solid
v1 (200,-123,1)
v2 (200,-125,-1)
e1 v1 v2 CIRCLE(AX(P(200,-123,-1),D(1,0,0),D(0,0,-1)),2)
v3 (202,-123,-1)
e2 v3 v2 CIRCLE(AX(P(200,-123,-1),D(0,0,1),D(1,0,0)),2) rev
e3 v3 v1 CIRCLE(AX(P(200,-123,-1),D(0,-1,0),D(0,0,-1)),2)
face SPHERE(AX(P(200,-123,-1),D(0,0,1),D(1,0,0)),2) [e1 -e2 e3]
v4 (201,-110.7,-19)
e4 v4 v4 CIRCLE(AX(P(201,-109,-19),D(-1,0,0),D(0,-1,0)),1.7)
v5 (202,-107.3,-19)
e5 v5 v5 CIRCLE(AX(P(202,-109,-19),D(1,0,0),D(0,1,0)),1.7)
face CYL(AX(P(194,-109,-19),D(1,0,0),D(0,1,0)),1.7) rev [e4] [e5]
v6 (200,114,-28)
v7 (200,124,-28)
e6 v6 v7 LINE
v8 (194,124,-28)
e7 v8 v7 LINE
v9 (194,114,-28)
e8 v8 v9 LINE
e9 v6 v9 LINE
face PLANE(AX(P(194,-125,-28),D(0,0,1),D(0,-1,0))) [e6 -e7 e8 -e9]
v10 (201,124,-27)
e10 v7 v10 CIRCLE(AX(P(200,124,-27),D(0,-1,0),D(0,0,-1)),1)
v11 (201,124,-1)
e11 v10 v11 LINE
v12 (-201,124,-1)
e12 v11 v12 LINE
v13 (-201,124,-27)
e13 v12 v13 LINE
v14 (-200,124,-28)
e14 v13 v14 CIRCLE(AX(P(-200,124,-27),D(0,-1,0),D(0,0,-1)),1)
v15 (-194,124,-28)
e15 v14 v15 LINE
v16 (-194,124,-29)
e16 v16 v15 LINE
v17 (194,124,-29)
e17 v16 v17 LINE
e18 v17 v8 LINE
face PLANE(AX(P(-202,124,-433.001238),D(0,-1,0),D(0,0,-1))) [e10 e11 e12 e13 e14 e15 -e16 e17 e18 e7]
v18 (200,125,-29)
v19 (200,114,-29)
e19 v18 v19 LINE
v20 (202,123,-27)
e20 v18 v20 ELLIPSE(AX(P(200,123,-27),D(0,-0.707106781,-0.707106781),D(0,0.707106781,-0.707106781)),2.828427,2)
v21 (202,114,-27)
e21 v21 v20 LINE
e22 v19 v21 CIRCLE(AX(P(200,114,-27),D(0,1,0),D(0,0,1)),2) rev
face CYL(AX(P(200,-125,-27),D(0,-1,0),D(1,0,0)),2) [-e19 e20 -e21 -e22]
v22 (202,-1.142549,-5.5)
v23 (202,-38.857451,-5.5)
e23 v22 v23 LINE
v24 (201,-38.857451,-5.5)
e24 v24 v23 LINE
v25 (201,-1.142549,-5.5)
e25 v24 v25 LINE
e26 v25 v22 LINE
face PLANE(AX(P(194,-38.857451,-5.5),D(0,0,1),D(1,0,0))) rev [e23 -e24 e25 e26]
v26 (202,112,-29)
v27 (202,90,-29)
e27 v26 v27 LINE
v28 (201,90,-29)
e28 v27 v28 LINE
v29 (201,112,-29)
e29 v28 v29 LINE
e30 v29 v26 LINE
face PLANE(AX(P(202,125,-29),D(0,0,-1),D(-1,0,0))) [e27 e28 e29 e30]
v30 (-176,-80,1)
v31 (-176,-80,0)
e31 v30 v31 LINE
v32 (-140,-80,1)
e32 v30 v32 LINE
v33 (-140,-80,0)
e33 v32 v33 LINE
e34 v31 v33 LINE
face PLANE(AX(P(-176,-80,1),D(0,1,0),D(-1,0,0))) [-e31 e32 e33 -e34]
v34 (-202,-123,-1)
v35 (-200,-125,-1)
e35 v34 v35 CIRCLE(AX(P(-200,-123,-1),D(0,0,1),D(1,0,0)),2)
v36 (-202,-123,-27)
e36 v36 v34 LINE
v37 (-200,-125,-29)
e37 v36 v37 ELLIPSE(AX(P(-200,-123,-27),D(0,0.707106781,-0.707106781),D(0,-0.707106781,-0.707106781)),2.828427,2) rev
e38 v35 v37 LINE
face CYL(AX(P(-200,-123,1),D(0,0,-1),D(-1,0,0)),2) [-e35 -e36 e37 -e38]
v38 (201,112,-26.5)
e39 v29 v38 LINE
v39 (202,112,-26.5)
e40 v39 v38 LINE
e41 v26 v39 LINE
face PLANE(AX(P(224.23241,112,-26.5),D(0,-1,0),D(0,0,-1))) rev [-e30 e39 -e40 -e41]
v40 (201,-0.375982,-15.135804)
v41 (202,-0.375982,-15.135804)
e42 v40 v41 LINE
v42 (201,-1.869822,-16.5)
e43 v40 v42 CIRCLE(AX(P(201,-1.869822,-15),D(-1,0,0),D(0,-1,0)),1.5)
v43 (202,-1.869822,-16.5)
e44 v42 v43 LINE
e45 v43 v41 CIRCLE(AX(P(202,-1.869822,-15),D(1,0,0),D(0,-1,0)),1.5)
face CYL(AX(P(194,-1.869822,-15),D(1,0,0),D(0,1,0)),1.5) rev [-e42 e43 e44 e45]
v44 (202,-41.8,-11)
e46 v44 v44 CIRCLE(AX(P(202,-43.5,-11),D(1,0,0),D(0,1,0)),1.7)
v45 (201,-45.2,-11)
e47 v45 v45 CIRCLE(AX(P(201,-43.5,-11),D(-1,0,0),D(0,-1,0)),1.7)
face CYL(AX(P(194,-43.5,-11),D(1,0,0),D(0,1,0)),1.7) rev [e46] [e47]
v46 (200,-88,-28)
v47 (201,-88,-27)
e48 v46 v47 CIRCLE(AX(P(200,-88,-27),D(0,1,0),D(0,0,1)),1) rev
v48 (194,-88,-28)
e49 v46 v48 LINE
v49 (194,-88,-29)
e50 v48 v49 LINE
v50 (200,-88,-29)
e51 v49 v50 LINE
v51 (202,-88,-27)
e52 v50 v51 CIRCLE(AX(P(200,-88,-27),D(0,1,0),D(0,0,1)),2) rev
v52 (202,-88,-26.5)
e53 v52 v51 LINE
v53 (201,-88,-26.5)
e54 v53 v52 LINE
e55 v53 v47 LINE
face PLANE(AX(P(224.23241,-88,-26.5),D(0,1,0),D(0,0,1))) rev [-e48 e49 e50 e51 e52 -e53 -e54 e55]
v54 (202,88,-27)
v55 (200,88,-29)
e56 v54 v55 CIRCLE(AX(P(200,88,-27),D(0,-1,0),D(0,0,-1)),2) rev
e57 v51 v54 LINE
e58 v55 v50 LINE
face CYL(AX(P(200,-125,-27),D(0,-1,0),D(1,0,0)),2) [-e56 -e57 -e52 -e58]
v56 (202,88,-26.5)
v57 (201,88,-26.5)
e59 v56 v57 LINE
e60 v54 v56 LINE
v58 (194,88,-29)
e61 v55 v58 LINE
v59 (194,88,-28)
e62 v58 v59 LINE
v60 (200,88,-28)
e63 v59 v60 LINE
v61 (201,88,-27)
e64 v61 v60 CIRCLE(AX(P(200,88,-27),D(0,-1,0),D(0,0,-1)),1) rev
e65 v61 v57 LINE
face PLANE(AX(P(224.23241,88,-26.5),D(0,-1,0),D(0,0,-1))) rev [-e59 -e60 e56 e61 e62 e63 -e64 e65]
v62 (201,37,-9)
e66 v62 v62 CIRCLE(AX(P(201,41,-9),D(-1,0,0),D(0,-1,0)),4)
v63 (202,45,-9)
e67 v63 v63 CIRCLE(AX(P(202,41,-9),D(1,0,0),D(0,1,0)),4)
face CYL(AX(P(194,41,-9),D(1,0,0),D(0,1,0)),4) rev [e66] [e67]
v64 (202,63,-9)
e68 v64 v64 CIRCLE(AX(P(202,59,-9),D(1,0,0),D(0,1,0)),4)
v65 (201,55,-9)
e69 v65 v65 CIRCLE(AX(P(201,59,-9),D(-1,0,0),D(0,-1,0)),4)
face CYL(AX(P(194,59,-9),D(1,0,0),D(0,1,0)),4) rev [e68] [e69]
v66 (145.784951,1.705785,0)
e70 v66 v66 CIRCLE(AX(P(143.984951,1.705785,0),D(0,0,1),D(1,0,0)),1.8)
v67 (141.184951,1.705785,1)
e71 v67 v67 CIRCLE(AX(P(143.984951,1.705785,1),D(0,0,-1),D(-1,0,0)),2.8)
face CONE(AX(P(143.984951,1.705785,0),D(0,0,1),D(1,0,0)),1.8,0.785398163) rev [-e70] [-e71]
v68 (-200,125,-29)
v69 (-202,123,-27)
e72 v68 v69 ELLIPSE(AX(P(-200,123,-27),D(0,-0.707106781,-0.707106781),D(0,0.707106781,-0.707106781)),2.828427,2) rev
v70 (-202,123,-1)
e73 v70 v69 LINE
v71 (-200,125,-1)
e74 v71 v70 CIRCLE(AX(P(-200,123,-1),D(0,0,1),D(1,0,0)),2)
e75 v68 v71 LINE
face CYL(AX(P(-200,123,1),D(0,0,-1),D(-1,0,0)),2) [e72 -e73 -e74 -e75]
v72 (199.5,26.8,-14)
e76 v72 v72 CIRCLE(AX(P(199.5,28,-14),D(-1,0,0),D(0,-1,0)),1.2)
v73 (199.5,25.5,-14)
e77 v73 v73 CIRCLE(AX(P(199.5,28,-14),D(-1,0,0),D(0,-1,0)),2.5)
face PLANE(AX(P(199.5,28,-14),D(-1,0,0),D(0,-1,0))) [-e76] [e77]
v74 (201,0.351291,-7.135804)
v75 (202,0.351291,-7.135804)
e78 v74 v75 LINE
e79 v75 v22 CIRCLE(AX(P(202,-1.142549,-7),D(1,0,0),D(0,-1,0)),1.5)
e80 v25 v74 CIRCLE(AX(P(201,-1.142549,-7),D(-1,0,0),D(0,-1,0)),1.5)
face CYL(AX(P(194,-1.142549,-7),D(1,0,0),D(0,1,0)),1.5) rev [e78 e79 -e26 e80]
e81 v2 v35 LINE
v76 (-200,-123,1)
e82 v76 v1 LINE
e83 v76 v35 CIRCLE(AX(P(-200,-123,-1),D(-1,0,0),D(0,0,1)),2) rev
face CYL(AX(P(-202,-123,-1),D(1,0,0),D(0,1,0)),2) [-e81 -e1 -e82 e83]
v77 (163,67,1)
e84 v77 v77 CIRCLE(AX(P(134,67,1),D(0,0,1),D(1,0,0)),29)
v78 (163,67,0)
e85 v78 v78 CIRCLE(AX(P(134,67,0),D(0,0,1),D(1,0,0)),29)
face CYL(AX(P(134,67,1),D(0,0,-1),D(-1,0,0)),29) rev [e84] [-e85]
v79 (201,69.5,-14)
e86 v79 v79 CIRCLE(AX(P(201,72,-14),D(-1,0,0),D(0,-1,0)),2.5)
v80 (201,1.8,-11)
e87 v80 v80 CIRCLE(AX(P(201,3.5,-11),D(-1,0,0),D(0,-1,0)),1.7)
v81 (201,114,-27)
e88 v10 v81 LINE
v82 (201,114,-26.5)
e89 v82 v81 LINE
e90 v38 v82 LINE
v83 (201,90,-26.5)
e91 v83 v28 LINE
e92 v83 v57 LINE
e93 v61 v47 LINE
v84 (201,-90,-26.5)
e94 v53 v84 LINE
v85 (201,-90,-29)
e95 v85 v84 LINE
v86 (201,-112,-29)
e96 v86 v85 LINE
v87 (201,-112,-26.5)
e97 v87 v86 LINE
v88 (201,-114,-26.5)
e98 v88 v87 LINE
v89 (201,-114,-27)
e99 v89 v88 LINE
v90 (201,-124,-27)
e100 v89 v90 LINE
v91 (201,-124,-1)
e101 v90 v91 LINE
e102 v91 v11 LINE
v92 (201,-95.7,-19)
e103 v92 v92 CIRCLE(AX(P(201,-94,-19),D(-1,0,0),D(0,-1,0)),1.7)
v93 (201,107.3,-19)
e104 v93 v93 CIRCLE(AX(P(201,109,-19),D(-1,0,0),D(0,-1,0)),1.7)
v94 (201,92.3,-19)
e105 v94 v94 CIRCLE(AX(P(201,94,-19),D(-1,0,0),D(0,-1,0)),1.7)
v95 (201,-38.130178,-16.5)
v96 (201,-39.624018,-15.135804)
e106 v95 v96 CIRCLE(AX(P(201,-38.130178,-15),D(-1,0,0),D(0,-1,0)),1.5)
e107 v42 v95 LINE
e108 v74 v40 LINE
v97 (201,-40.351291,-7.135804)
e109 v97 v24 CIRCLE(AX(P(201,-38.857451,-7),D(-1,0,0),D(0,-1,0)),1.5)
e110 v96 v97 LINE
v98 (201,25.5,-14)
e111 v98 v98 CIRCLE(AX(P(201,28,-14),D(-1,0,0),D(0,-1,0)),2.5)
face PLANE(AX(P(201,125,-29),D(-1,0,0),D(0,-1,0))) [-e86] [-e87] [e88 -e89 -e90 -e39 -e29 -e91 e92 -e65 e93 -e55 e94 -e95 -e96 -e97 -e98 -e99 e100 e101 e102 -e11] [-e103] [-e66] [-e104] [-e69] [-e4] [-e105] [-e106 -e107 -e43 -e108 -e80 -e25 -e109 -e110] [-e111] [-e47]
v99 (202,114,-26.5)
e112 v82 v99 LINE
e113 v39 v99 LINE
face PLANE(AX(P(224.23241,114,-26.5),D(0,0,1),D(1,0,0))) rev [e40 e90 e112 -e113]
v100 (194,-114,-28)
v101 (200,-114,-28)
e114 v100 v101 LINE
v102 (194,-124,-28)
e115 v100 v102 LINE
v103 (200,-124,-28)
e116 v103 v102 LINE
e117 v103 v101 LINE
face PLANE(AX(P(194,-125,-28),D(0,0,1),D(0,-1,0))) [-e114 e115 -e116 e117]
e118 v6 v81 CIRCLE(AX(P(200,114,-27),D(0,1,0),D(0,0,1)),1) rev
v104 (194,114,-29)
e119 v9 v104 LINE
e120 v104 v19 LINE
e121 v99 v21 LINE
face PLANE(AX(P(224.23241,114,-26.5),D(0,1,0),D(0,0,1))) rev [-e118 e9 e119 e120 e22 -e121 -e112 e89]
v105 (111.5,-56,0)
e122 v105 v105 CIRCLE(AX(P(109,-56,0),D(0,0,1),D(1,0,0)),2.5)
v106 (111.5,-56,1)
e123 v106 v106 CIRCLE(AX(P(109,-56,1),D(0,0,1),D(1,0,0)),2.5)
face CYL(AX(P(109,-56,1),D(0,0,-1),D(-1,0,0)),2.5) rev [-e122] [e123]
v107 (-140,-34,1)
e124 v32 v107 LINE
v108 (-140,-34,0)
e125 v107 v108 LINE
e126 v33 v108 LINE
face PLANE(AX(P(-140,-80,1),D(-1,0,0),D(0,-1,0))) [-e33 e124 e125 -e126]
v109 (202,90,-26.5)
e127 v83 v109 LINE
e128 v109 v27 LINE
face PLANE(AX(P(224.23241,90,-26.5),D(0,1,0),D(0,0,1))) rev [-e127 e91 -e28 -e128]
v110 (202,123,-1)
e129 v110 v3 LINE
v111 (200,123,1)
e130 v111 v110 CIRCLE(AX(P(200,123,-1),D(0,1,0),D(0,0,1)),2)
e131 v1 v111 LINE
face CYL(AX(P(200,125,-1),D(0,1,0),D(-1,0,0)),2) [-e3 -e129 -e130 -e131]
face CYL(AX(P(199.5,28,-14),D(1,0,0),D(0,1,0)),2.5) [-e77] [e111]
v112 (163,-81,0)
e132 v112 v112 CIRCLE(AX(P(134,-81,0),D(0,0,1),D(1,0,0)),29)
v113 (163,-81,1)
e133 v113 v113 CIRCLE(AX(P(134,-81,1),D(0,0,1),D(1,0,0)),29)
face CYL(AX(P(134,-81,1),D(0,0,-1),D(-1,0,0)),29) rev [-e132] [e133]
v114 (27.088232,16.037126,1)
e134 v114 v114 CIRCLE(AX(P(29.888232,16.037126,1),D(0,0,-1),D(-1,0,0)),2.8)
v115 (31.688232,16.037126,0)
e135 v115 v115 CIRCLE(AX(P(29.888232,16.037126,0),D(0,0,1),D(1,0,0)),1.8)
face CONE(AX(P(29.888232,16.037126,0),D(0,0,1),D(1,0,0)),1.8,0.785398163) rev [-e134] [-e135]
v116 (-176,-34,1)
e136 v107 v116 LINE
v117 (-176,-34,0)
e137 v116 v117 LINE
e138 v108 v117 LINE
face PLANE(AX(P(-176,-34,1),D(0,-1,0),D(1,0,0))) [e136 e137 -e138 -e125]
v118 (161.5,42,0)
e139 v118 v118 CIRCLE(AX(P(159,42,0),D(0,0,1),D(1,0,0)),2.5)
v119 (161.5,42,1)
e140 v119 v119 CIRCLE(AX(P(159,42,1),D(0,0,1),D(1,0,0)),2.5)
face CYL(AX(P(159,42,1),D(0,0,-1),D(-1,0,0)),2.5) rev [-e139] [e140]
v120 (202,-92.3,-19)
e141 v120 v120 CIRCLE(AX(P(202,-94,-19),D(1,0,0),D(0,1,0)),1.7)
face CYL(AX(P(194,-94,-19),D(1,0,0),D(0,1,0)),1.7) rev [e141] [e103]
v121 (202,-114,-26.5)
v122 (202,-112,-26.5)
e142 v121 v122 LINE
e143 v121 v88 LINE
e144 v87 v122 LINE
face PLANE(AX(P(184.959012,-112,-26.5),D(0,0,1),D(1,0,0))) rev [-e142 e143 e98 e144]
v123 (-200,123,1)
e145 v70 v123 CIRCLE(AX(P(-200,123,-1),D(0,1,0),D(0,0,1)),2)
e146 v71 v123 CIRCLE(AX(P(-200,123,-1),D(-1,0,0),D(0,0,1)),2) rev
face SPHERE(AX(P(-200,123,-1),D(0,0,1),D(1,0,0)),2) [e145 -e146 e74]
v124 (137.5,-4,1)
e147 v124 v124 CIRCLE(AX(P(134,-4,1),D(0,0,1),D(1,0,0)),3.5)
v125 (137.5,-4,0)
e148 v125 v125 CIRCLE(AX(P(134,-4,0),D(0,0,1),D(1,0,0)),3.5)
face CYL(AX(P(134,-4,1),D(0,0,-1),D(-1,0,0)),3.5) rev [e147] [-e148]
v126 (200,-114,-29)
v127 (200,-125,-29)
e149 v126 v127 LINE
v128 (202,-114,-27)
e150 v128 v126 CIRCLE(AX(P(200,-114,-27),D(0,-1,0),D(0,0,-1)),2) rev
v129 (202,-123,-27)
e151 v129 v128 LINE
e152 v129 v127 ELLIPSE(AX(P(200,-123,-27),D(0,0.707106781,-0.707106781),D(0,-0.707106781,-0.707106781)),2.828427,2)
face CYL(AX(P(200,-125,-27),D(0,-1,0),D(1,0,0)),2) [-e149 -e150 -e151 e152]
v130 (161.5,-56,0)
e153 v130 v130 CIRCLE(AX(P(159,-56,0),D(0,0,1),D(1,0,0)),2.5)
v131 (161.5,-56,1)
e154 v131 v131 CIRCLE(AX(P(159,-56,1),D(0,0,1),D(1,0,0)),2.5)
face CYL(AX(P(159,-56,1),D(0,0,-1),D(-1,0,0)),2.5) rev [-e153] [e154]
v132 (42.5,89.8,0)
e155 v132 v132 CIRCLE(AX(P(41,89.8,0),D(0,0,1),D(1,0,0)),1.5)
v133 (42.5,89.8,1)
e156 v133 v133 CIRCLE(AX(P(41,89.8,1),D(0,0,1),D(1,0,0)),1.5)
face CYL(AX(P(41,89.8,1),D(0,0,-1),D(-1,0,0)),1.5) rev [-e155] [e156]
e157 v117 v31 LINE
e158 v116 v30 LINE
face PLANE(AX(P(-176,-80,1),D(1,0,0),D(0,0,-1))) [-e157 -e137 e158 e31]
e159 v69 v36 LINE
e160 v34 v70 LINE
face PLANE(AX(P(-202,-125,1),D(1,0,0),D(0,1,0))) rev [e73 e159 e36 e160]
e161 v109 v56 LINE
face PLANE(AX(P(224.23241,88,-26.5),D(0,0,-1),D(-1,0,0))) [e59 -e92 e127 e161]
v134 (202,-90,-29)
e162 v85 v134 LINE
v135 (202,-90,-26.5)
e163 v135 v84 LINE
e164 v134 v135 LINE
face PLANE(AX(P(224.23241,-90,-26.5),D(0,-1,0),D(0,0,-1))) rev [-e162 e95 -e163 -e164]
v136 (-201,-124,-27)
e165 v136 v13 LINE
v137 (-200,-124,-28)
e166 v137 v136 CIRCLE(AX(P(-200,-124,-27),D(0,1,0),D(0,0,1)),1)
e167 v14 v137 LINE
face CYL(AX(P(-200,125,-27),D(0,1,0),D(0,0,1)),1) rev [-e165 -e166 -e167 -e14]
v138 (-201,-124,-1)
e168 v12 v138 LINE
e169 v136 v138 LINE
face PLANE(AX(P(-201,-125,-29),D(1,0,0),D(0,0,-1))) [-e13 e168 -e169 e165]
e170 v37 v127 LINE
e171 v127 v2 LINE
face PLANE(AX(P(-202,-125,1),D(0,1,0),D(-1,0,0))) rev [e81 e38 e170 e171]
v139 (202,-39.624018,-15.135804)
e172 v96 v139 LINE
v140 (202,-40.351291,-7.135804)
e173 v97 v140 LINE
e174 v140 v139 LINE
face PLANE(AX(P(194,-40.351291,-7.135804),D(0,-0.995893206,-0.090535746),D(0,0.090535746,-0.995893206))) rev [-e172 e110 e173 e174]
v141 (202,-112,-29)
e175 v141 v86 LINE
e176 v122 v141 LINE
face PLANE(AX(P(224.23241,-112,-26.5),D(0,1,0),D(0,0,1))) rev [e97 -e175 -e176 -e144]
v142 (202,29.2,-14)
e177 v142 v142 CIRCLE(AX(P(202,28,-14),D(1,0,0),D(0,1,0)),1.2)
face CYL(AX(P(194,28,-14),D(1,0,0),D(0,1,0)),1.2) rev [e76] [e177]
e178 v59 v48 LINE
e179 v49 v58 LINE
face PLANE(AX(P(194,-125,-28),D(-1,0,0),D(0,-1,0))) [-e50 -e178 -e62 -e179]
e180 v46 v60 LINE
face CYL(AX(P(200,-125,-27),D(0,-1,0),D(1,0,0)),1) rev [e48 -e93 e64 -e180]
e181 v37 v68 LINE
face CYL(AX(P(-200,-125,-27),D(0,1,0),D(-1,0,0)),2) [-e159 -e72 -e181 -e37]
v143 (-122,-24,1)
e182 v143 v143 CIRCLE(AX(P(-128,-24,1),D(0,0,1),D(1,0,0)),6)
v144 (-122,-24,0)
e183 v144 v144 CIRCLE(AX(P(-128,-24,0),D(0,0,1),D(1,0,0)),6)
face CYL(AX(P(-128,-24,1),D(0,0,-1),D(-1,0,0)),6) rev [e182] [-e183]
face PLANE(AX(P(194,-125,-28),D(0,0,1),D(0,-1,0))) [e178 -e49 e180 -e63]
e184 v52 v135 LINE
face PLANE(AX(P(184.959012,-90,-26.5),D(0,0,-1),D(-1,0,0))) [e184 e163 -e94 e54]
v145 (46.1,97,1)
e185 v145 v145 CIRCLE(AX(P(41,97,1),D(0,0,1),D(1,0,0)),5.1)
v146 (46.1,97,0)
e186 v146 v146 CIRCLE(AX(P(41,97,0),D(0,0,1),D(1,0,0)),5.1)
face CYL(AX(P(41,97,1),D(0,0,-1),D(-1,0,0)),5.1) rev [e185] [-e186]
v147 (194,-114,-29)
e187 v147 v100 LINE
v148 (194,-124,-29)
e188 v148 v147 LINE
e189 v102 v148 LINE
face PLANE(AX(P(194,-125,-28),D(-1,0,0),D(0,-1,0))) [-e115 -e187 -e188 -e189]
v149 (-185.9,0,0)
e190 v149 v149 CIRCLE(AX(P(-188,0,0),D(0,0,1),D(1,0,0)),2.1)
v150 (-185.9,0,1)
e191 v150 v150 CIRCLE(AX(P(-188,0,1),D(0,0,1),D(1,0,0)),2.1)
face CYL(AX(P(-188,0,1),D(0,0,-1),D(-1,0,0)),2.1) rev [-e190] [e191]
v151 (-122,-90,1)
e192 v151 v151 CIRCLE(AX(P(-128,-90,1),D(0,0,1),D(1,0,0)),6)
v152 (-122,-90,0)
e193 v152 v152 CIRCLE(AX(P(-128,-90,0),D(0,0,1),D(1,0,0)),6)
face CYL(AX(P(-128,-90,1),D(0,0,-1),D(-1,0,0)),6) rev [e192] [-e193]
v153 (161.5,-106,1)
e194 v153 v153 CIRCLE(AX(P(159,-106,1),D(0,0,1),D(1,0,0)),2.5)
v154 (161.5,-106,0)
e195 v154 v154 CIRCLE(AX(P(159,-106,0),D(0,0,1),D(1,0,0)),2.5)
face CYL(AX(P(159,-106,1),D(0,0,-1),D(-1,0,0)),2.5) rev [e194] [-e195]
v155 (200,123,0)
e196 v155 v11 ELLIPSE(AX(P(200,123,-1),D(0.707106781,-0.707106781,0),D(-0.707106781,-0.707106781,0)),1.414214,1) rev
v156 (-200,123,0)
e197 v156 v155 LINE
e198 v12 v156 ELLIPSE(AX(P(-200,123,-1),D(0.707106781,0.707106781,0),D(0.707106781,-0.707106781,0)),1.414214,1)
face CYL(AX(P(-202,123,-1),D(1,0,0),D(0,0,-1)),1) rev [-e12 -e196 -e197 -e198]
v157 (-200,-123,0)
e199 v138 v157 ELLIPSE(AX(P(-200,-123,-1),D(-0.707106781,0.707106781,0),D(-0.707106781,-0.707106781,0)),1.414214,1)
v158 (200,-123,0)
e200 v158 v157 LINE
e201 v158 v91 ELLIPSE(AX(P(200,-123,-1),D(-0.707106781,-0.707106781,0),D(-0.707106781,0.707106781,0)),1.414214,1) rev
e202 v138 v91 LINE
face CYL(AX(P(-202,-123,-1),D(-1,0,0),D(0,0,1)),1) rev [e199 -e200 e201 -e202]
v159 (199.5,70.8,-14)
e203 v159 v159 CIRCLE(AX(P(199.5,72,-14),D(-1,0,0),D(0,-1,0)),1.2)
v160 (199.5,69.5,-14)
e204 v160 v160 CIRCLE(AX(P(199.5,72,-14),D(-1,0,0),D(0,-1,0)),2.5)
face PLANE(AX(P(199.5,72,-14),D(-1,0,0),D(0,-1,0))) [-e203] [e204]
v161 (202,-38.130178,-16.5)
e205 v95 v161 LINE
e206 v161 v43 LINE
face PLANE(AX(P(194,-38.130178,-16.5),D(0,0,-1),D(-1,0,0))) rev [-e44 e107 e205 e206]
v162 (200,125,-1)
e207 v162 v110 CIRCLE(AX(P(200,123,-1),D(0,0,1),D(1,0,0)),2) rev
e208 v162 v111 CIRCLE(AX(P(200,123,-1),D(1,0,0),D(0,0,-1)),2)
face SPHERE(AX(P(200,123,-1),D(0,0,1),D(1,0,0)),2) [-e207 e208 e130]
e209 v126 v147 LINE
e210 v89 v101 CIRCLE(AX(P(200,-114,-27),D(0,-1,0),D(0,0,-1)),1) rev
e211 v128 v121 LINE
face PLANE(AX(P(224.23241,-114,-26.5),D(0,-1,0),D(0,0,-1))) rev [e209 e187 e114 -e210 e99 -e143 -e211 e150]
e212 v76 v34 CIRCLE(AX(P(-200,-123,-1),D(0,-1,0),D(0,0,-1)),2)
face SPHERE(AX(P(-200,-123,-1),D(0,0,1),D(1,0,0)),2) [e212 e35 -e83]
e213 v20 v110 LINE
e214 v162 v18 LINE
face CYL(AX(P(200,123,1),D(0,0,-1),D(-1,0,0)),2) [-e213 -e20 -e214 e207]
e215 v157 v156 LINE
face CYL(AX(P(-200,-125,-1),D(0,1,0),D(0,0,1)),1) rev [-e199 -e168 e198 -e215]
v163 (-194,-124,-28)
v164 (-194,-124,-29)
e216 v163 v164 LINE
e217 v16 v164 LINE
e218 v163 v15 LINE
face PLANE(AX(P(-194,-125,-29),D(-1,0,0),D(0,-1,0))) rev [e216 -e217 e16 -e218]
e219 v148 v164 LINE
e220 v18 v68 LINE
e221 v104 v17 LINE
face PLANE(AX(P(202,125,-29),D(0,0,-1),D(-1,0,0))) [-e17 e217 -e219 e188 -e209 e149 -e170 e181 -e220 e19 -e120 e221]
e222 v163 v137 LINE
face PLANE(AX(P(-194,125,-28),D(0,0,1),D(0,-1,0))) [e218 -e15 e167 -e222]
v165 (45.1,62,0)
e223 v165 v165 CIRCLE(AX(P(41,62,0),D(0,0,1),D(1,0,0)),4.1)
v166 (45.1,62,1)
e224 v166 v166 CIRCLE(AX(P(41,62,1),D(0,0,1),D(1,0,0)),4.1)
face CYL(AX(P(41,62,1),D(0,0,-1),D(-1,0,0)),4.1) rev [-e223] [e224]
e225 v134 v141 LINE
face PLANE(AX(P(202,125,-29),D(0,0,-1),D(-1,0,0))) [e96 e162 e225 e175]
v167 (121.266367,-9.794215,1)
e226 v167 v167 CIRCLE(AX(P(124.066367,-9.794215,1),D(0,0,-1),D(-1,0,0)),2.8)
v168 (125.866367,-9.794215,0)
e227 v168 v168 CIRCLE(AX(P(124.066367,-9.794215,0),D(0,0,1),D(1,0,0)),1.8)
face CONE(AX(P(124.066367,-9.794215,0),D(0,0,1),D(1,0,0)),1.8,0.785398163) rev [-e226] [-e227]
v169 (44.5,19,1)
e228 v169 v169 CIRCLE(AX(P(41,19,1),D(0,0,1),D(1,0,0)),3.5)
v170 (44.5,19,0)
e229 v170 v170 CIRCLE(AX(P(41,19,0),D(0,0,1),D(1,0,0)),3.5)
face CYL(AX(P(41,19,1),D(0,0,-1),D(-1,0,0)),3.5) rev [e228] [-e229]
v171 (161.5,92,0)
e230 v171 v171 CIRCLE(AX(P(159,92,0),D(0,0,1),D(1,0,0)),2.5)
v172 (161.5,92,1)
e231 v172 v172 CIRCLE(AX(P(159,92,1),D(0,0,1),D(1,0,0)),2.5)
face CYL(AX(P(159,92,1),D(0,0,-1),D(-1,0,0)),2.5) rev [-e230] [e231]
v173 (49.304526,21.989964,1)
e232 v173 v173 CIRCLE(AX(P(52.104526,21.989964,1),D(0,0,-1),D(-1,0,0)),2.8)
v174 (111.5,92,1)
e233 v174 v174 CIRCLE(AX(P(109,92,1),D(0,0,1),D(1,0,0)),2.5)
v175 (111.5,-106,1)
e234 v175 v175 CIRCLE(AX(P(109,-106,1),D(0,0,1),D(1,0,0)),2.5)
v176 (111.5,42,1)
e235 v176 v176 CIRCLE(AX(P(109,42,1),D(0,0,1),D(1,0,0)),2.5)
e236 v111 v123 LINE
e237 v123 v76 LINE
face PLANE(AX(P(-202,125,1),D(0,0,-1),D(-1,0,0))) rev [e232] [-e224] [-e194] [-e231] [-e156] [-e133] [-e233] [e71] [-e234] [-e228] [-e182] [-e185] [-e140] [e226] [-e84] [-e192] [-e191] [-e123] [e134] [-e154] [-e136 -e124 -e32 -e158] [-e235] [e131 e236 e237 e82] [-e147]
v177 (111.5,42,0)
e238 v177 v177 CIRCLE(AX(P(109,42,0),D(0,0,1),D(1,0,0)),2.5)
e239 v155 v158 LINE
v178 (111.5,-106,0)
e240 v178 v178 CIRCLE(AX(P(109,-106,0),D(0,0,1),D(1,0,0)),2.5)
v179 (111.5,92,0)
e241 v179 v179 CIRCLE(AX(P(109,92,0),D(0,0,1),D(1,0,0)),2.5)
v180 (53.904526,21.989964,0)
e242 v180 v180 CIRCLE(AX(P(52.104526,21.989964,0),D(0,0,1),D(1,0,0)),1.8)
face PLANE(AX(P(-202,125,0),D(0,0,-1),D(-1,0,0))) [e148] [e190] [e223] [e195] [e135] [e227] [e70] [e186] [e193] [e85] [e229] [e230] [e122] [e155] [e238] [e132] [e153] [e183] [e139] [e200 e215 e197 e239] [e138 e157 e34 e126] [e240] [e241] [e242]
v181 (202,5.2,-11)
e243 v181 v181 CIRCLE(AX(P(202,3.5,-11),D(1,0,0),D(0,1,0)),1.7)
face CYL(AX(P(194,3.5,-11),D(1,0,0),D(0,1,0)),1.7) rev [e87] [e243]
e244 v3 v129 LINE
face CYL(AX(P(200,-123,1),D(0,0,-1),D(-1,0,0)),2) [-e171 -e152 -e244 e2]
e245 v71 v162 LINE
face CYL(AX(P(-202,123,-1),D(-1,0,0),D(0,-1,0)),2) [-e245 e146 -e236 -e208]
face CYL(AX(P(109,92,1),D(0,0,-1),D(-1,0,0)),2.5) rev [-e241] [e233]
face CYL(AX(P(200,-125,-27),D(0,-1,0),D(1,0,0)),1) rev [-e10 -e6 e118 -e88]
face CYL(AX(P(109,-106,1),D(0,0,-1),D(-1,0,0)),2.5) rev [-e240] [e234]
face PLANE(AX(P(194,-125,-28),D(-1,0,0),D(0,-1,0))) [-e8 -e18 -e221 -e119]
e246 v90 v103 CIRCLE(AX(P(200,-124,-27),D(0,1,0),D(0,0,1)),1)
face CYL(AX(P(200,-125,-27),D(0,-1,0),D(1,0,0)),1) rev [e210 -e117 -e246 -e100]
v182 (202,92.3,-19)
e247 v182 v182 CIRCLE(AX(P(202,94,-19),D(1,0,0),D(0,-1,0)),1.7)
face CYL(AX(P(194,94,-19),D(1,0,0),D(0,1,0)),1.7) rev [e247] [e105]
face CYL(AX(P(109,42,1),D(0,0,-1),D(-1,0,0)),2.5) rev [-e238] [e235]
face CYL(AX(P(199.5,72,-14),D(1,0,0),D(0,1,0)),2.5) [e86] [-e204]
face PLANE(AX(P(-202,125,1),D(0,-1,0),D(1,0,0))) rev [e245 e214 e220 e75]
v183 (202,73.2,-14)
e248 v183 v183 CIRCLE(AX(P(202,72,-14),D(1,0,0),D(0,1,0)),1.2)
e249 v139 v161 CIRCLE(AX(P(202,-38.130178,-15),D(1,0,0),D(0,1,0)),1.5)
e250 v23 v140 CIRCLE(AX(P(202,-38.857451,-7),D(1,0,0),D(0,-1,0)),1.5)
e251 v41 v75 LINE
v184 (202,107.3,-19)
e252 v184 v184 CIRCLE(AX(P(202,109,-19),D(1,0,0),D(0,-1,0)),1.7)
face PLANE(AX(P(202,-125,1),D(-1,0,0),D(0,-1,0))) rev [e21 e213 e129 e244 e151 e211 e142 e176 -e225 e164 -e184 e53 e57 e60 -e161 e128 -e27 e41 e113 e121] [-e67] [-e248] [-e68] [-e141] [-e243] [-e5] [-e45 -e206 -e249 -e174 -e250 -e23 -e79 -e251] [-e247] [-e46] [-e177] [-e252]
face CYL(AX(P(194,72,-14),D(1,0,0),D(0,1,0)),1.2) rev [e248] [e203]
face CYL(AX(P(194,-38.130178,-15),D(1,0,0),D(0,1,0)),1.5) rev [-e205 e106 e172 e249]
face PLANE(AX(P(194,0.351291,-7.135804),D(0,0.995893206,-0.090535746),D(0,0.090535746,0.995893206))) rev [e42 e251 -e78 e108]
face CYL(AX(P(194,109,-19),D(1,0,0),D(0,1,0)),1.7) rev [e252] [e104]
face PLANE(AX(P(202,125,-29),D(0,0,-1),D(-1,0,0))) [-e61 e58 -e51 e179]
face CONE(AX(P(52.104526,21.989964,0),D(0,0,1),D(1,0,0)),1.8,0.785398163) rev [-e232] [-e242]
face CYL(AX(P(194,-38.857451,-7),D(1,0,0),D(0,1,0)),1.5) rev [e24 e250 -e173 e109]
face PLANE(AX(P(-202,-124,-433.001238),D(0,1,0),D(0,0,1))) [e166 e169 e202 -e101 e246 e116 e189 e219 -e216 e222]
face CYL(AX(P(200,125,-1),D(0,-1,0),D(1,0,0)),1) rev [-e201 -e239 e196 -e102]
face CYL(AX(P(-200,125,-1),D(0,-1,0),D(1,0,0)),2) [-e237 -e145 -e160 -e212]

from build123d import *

# Parameters (mm, degrees)
SKETCH_1_W          = 404
SKETCH_1_H          = 250
SKETCH_1_R          = 3.5
SKETCH_1_R_2        = 6
SKETCH_1_R_3        = 29
SKETCH_1_R_4        = 2.5
SKETCH_1_R_5        = 1.8
SKETCH_1_R_6        = 5.1
SKETCH_1_R_7        = 1.5
SKETCH_1_R_8        = 4.1
SKETCH_1_R_9        = 2.1
SKETCH_1_W_2        = 36
SKETCH_1_H_2        = 46
EXTRUDE_1_DEPTH     = 1
SKETCH_2_W          = 1
SKETCH_2_H          = 250
EXTRUDE_2_DEPTH     = 30
SKETCH_3_W          = 1
SKETCH_3_H          = 250
EXTRUDE_3_DEPTH     = 8
SKETCH_4_W          = 1
SKETCH_4_H          = 250
EXTRUDE_4_DEPTH     = 8
SKETCH_5_R          = 1.7
SKETCH_5_R_2        = 4
SKETCH_5_R_3        = 1.2
CUT_EXTRUDE_1_DEPTH = 8
CHAMFER_2_SIZE      = 1
SKETCH_6_W          = 404
SKETCH_6_H          = 1
SKETCH_6_W_2        = 403
EXTRUDE_5_DEPTH     = 30
FILLET_1_R          = 1
FILLET_2_R          = 2
SKETCH_7_W          = 39.273398561
SKETCH_7_H          = 2
CUT_EXTRUDE_2_DEPTH = 2.5
SKETCH_8_W          = 16.105327303
SKETCH_8_H          = 23.169067349
SKETCH_8_W_2        = 20.44042911
SKETCH_8_H_2        = 24.240130898
CUT_EXTRUDE_3_DEPTH = 2
SKETCH_9_W          = 1
SKETCH_9_H          = 22
EXTRUDE_6_DEPTH     = 2
SKETCH_10_R         = 2.5
SKETCH_10_R_2       = 1.2
EXTRUDE_7_DEPTH     = 1.5


with BuildPart() as part:
    # Эскиз1 → Вытянуть1 (new body)
    with BuildSketch(Plane.XY):
        Rectangle(SKETCH_1_W, SKETCH_1_H)
        with Locations((134, -4)):
            Circle(SKETCH_1_R, mode=Mode.SUBTRACT)
        with Locations((-128, -24)):
            Circle(SKETCH_1_R_2, mode=Mode.SUBTRACT)
        with Locations((-128, -90)):
            Circle(SKETCH_1_R_2, mode=Mode.SUBTRACT)
        with Locations((134, 67)):
            Circle(SKETCH_1_R_3, mode=Mode.SUBTRACT)
        with Locations((109, 92)):
            Circle(SKETCH_1_R_4, mode=Mode.SUBTRACT)
        with Locations((109, 42)):
            Circle(SKETCH_1_R_4, mode=Mode.SUBTRACT)
        with Locations((159, 42)):
            Circle(SKETCH_1_R_4, mode=Mode.SUBTRACT)
        with Locations((159, 92)):
            Circle(SKETCH_1_R_4, mode=Mode.SUBTRACT)
        with Locations((124.06636679, -9.794215326)):
            Circle(SKETCH_1_R_5, mode=Mode.SUBTRACT)
        with Locations((143.984951077, 1.705784674)):
            Circle(SKETCH_1_R_5, mode=Mode.SUBTRACT)
        with Locations((134, -81)):
            Circle(SKETCH_1_R_3, mode=Mode.SUBTRACT)
        with Locations((109, -56)):
            Circle(SKETCH_1_R_4, mode=Mode.SUBTRACT)
        with Locations((159, -56)):
            Circle(SKETCH_1_R_4, mode=Mode.SUBTRACT)
        with Locations((159, -106)):
            Circle(SKETCH_1_R_4, mode=Mode.SUBTRACT)
        with Locations((109, -106)):
            Circle(SKETCH_1_R_4, mode=Mode.SUBTRACT)
        with Locations((41, 97)):
            Circle(SKETCH_1_R_6, mode=Mode.SUBTRACT)
        with Locations((41, 89.8)):
            Circle(SKETCH_1_R_7, mode=Mode.SUBTRACT)
        with Locations((41, 62)):
            Circle(SKETCH_1_R_8, mode=Mode.SUBTRACT)
        with Locations((41, 19)):
            Circle(SKETCH_1_R, mode=Mode.SUBTRACT)
        with Locations((29.888232445, 16.03712609)):
            Circle(SKETCH_1_R_5, mode=Mode.SUBTRACT)
        with Locations((52.10452645, 21.989964127)):
            Circle(SKETCH_1_R_5, mode=Mode.SUBTRACT)
        with Locations((-188, 0)):
            Circle(SKETCH_1_R_9, mode=Mode.SUBTRACT)
        with Locations((-158, -57)):
            Rectangle(SKETCH_1_W_2, SKETCH_1_H_2, mode=Mode.SUBTRACT)
    extrude(amount=EXTRUDE_1_DEPTH)

    # Эскиз2 → Вытянуть2 (add)
    with BuildSketch(Plane.XY.offset(1)):
        with Locations((201.5, 0)):
            Rectangle(SKETCH_2_W, SKETCH_2_H)
        with Locations((-201.5, 0)):
            Rectangle(SKETCH_2_W, SKETCH_2_H)
    extrude(amount=-EXTRUDE_2_DEPTH)

    # Эскиз3 → Вытянуть3 (add)
    with BuildSketch(Plane.ZY.offset(202)):
        with Locations((-28.5, 0)):
            Rectangle(SKETCH_3_W, SKETCH_3_H)
    extrude(amount=-EXTRUDE_3_DEPTH)

    # Эскиз4 → Вытянуть4 (add)
    with BuildSketch(Plane(origin=(202, 0, 0), x_dir=(0, 0, -1), z_dir=(1, 0, 0))):
        with Locations((28.5, 0)):
            Rectangle(SKETCH_4_W, SKETCH_4_H)
    extrude(amount=-EXTRUDE_4_DEPTH)

    # Эскиз5 → Вырез-Вытянуть1 (cut)
    with BuildSketch(Plane(origin=(202, 0, 0), x_dir=(0, 0, -1), z_dir=(1, 0, 0))):
        with Locations(Location((19, -109, 0), (0, 0, 90))):
            Circle(SKETCH_5_R)
        with Locations(Location((19, 109, 0), (0, 0, 270))):
            Circle(SKETCH_5_R)
        with Locations(Location((11, 3.5, 0), (0, 0, 90))):
            Circle(SKETCH_5_R)
        with Locations(Location((11, -43.5, 0), (0, 0, 90))):
            Circle(SKETCH_5_R)
        with Locations(Location((9, 59, 0), (0, 0, 90))):
            Circle(SKETCH_5_R_2)
        with Locations(Location((9, 41, 0), (0, 0, 90))):
            Circle(SKETCH_5_R_2)
        with Locations(Location((14, 72, 0), (0, 0, 90))):
            Circle(SKETCH_5_R_3)
        with Locations(Location((14, 28, 0), (0, 0, 90))):
            Circle(SKETCH_5_R_3)
        with Locations(Location((19, -94, 0), (0, 0, 90))):
            Circle(SKETCH_5_R)
        with Locations(Location((19, 94, 0), (0, 0, 270))):
            Circle(SKETCH_5_R)
        with BuildLine():
            Line((7.135803619, 0.35129058), (15.135803619, -0.375982147))
            ThreePointArc((15.135803619, -0.375982147), (16.107633836, -0.858314525), (16.5, -1.869821957))
            Line((16.5, -1.869821957), (16.5, -38.130178043))
            ThreePointArc((16.5, -38.130178043), (16.107633836, -39.141685475), (15.135803619, -39.624017853))
            Line((15.135803619, -39.624017853), (7.135803619, -40.35129058))
            ThreePointArc((7.135803619, -40.35129058), (5.988492568, -39.965084606), (5.5, -38.85745077))
            Line((5.5, -38.85745077), (5.5, -1.14254923))
            ThreePointArc((5.5, -1.14254923), (5.988492568, -0.034915394), (7.135803619, 0.35129058))
        make_face()
    extrude(amount=-CUT_EXTRUDE_1_DEPTH, mode=Mode.SUBTRACT)

    # Фаска2
    chamfer_2_edges = [part.edges().sort_by_distance(p)[0] for p in [
        (122.26636679, -9.794215326, 1),
        (28.088232445, 16.03712609, 1),
        (50.30452645, 21.989964127, 1),
        (142.184951077, 1.705784674, 1),
    ]]
    chamfer(chamfer_2_edges, length=CHAMFER_2_SIZE - 0.0001)  # a hair under: the kernel refuses the full size

    # Эскиз6 → Вытянуть5 (add)
    with BuildSketch(Plane.XY.offset(1)):
        with Locations((0, 124.5)):
            Rectangle(SKETCH_6_W, SKETCH_6_H)
        with Locations((-0.5, -124.5)):
            Rectangle(SKETCH_6_W_2, SKETCH_6_H)
    extrude(amount=-EXTRUDE_5_DEPTH)

    # Скругление1
    fillet_1_edges = [part.edges().sort_by_distance(p)[0] for p in [
        (-201, 0, 0),
        (0, 124, 0),
        (201, 0, 0),
        (0, -124, 0),
        (201, 0, -28),
        (-201, 0, -28),
    ]]
    fillet(fillet_1_edges, radius=FILLET_1_R)

    # Скругление2
    fillet_2_edges = [part.edges().sort_by_distance(p)[0] for p in [
        (0, 125, 1),
        (-202, 0, 1),
        (0, -125, 1),
        (202, 0, 1),
        (-202, 0, -29),
        (202, 0, -29),
        (-202, 125, -14),
        (202, 125, -14),
        (-202, -125, -14),
        (202, -125, -14),
    ]]
    fillet(fillet_2_edges, radius=FILLET_2_R)

    # Эскиз7 → Вырез-Вытянуть2 (cut)
    with BuildSketch(Plane(origin=(0, 0, -29), x_dir=(-1, 0, 0), z_dir=(0, 0, -1))):
        with Locations((-204.595711045, -113)):
            Rectangle(SKETCH_7_W, SKETCH_7_H)
        with Locations((-204.595711045, 113)):
            Rectangle(SKETCH_7_W, SKETCH_7_H)
        with Locations((-204.595711045, -89)):
            Rectangle(SKETCH_7_W, SKETCH_7_H)
        with Locations((-204.595711045, 89)):
            Rectangle(SKETCH_7_W, SKETCH_7_H)
    extrude(amount=-CUT_EXTRUDE_2_DEPTH, mode=Mode.SUBTRACT)

    # Эскиз8 → Вырез-Вытянуть3 (cut)
    with BuildSketch(Plane(origin=(0, 0, -29), x_dir=(-1, 0, 0), z_dir=(0, 0, -1))):
        with Locations((-198.211121585, 101.246537182)):
            Rectangle(SKETCH_8_W, SKETCH_8_H)
        with Locations((-197.698675363, -101.007536633)):
            Rectangle(SKETCH_8_W_2, SKETCH_8_H_2)
    extrude(amount=-CUT_EXTRUDE_3_DEPTH, mode=Mode.SUBTRACT)

    # Эскиз9 → Вытянуть6 (add)
    with BuildSketch(Plane(origin=(0, 0, -27), x_dir=(-1, 0, 0), z_dir=(0, 0, -1))):
        with Locations((-201.5, 101)):
            Rectangle(SKETCH_9_W, SKETCH_9_H)
        with Locations((-201.5, -101)):
            Rectangle(SKETCH_9_W, SKETCH_9_H)
    extrude(amount=EXTRUDE_6_DEPTH)

    # Эскиз10 → Вытянуть7 (add)
    # profile 1 of 2: a face of its own
    with BuildSketch(Plane.ZY.offset(-201)):
        with Locations(Location((-14, 28, 0), (0, 0, 270))):
            Circle(SKETCH_10_R)
        with Locations(Location((-14, 28, 0), (0, 0, 90))):
            Circle(SKETCH_10_R_2, mode=Mode.SUBTRACT)
    # profile 2 of 2: a face of its own
    with BuildSketch(Plane.ZY.offset(-201)):
        with Locations(Location((-14, 72, 0), (0, 0, 270))):
            Circle(SKETCH_10_R)
        with Locations(Location((-14, 72, 0), (0, 0, 90))):
            Circle(SKETCH_10_R_2, mode=Mode.SUBTRACT)
    extrude(amount=EXTRUDE_7_DEPTH)


solid = part.part
